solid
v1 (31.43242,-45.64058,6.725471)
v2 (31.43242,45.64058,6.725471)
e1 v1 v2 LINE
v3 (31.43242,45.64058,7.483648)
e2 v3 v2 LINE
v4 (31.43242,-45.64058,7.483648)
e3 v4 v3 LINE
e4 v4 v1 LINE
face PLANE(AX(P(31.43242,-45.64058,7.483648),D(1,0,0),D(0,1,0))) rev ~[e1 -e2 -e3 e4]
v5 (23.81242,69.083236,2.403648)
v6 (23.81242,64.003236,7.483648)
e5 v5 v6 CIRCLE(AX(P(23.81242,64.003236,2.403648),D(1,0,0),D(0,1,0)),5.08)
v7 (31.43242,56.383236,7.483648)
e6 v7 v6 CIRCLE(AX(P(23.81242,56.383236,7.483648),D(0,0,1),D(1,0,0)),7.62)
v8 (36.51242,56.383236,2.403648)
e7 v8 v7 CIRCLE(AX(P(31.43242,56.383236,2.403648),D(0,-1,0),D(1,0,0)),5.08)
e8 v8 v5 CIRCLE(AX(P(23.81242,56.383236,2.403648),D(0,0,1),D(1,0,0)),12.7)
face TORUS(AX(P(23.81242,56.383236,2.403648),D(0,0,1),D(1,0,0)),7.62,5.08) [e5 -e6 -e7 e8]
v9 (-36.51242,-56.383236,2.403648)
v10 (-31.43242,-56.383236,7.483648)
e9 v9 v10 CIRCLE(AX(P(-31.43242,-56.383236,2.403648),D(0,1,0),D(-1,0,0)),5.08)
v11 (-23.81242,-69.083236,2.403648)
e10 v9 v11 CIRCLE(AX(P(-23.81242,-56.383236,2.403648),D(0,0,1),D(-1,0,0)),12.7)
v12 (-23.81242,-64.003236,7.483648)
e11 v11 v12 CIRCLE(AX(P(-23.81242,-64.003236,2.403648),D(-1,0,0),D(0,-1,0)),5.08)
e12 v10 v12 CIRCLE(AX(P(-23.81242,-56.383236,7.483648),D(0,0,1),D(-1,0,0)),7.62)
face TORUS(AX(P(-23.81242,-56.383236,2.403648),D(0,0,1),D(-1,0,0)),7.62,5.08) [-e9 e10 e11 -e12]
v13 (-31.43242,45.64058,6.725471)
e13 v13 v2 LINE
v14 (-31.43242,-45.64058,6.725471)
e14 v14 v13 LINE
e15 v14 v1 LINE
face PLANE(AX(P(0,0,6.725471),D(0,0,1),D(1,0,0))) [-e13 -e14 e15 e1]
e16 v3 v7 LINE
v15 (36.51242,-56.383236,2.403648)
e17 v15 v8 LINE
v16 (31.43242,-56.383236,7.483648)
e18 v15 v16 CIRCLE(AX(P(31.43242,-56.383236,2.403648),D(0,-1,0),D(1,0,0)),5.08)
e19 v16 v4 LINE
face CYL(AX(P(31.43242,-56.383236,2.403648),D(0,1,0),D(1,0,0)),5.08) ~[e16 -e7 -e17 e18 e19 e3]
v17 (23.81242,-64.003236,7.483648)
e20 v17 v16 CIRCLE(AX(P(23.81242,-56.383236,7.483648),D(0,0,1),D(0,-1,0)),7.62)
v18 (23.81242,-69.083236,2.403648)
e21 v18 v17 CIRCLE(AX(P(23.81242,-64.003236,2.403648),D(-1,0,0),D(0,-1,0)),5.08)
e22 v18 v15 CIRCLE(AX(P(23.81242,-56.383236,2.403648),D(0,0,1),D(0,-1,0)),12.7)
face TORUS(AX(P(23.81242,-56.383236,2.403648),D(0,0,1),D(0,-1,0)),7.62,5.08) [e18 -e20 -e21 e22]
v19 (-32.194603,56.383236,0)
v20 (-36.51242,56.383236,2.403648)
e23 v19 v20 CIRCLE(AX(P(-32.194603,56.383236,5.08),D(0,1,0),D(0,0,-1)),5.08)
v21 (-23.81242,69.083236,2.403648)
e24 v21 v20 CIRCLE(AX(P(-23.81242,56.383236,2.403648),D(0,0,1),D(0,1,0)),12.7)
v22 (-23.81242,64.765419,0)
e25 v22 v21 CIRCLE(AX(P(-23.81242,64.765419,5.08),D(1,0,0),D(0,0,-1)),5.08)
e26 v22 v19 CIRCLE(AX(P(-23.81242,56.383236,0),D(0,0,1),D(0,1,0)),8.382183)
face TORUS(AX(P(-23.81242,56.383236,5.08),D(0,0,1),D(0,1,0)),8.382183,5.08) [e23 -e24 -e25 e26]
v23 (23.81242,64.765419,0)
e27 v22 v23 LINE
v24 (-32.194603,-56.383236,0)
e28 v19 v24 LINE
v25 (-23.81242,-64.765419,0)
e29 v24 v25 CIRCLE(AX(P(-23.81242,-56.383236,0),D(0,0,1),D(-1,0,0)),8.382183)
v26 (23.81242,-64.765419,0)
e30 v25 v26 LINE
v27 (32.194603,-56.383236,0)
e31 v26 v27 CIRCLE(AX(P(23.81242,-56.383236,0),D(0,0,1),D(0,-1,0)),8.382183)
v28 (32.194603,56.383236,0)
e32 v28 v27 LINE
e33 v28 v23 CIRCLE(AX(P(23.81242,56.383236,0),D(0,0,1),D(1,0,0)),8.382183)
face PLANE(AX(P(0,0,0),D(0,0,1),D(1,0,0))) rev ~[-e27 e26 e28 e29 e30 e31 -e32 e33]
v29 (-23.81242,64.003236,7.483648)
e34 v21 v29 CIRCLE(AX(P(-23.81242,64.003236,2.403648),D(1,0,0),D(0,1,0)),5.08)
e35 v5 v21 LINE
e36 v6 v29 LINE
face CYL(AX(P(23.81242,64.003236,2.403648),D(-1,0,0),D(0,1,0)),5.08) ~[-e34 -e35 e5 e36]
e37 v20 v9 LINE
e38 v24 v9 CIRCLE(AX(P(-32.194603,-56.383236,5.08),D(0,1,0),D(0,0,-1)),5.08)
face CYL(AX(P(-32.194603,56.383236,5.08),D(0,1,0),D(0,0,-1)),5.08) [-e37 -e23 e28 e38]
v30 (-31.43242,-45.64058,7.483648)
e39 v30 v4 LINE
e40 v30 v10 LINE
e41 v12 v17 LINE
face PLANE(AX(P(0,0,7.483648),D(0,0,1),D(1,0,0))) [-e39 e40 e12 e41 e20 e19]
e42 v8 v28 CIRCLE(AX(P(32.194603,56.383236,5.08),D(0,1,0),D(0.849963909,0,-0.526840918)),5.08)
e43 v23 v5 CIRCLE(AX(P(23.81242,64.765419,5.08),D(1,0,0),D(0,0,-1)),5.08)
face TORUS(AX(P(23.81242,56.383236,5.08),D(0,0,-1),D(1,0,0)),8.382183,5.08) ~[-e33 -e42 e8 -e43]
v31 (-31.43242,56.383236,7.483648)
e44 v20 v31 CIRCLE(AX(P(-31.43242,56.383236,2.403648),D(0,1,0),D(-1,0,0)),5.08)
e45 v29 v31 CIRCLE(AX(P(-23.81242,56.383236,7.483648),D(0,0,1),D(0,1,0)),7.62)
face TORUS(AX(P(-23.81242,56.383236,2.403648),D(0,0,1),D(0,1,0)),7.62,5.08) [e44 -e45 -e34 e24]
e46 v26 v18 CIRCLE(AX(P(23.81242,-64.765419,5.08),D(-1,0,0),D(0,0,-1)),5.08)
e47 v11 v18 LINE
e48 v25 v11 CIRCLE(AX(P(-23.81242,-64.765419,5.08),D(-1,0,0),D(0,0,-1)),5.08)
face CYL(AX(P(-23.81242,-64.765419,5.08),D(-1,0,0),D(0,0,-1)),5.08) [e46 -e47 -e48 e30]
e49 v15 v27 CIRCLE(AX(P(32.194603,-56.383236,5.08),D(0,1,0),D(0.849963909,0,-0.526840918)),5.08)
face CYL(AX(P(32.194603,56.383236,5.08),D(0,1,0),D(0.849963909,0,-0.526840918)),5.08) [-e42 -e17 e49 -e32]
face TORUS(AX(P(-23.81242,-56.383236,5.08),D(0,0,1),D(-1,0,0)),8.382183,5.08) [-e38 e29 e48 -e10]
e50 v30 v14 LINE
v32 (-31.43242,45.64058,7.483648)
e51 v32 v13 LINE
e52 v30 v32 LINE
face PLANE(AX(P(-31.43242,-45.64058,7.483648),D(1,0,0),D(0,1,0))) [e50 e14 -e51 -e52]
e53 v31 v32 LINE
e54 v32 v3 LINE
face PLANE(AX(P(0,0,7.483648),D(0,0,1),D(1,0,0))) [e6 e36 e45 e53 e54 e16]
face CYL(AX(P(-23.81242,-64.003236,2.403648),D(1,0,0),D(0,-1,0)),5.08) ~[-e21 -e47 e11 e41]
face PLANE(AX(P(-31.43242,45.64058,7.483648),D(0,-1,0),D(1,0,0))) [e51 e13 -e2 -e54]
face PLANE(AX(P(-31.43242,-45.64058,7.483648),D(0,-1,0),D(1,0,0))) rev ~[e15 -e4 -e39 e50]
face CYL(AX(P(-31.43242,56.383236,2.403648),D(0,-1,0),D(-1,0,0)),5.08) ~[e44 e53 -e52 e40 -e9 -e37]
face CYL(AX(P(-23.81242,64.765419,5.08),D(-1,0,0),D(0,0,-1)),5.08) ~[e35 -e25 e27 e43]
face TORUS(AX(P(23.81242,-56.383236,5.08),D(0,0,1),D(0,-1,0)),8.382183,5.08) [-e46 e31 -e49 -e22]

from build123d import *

# Parameters (mm, degrees)
F1_DEPTH     = 7.4836481363
F2_R         = 5.08
F3_T1_DEPTH  = 47.6248391628
F3_T3_DEPTH  = 112.7664723158
F3_T6_ANGLE  = 90
F3_T8_ANGLE  = 90
F3_T10_ANGLE = 90
F3_T12_ANGLE = 90
F4_W         = 62.8648391628
F4_H         = 91.2811607122
F5_DEPTH     = 0.7581766695


# Not quite as in the source:
# - a fillet or chamfer that OpenCascade refuses, or shapes differently, is made with other operations: its cross-section is extruded or revolved along the edge and cut away or added


with BuildPart() as f1:
    # F0 (on Top) → F1 (new body)
    with BuildSketch(Plane.XY):
        with BuildLine():
            ThreePointArc((36.5124195814, 56.3832361579), (32.7926757025, 65.363492279), (23.8124195814, 69.0832361579))
            Line((23.8124195814, 69.0832361579), (-23.8124195814, 69.0832361579))
            ThreePointArc((-23.8124195814, 69.0832361579), (-32.7926757025, 65.363492279), (-36.5124195814, 56.3832361579))
            Line((-36.5124195814, 56.3832361579), (-36.5124195814, -56.3832361579))
            ThreePointArc((-36.5124195814, -56.3832361579), (-32.7926757025, -65.363492279), (-23.8124195814, -69.0832361579))
            Line((-23.8124195814, -69.0832361579), (23.8124195814, -69.0832361579))
            ThreePointArc((23.8124195814, -69.0832361579), (32.7926757025, -65.363492279), (36.5124195814, -56.3832361579))
            Line((36.5124195814, -56.3832361579), (36.5124195814, 56.3832361579))
        make_face()
    extrude(amount=F1_DEPTH)

    # F2
    f2_edges = [f1.edges().sort_by_distance(p)[0] for p in [
        (0, -69.083236, 7.483648),
    ]]
    fillet(f2_edges, radius=F2_R)

    # F3: fillet of radius 5.08 on 1 edges, made by hand

    # F3_s2 → F3_t1 (cut)
    with BuildSketch(Plane.YZ.offset(-23.8124195814)):
        with BuildLine():
            ThreePointArc((-64.7654194988, 0), (-67.2363032003, 0.6414040808), (-69.0832361579, 2.4036481363))
            Line((-69.0832361579, 2.4036481363), (-69.0832361579, 0))
            Line((-69.0832361579, 0), (-64.7654194988, 0))
        make_face()
        with BuildLine():
            ThreePointArc((64.7654194988, 0), (67.2363032003, 0.6414040808), (69.0832361579, 2.4036481363))
            Line((69.0832361579, 2.4036481363), (69.0832361579, 0))
            Line((69.0832361579, 0), (64.7654194988, 0))
        make_face()
    extrude(amount=F3_T1_DEPTH, mode=Mode.SUBTRACT)

    # F3_s4 → F3_t3 (cut)
    with BuildSketch(Plane.XZ.offset(-56.3832361579)):
        with BuildLine():
            ThreePointArc((36.5124195814, 2.4036481363), (34.6654866238, 0.6414040808), (32.1946029223, 0))
            Line((32.1946029223, 0), (36.5124195814, 0))
            Line((36.5124195814, 0), (36.5124195814, 2.4036481363))
        make_face()
        with BuildLine():
            ThreePointArc((-32.1946029223, 0), (-34.6654866238, 0.6414040808), (-36.5124195814, 2.4036481363))
            Line((-36.5124195814, 2.4036481363), (-36.5124195814, 0))
            Line((-36.5124195814, 0), (-32.1946029223, 0))
        make_face()
    extrude(amount=F3_T3_DEPTH, mode=Mode.SUBTRACT)

    # F3_s5 → F3_t6 (revolve, cut)
    with BuildSketch(Plane.XZ.offset(56.3832361579)):
        with BuildLine():
            ThreePointArc((-32.1946029223, 0), (-34.6654866238, 0.6414040808), (-36.5124195814, 2.4036481363))
            Line((-36.5124195814, 2.4036481363), (-36.5124195814, 0))
            Line((-36.5124195814, 0), (-32.1946029223, 0))
        make_face()
    revolve(axis=Axis((-23.8124195814, -56.3832361579, 0), (0, 0, 1)), revolution_arc=F3_T6_ANGLE, mode=Mode.SUBTRACT)

    # F3_s7 → F3_t8 (revolve, cut)
    with BuildSketch(Plane.YZ.offset(23.8124195814)):
        with BuildLine():
            ThreePointArc((-64.7654194988, 0), (-67.2363032003, 0.6414040808), (-69.0832361579, 2.4036481363))
            Line((-69.0832361579, 2.4036481363), (-69.0832361579, 0))
            Line((-69.0832361579, 0), (-64.7654194988, 0))
        make_face()
    revolve(axis=Axis((23.8124195814, -56.3832361579, 0), (0, 0, 1)), revolution_arc=F3_T8_ANGLE, mode=Mode.SUBTRACT)

    # F3_s9 → F3_t10 (revolve, cut)
    with BuildSketch(Plane.XZ.offset(-56.3832361579)):
        with BuildLine():
            ThreePointArc((36.5124195814, 2.4036481363), (34.6654866238, 0.6414040808), (32.1946029223, 0))
            Line((32.1946029223, 0), (36.5124195814, 0))
            Line((36.5124195814, 0), (36.5124195814, 2.4036481363))
        make_face()
    revolve(axis=Axis((23.8124195814, 56.3832361579, 0), (0, 0, 1)), revolution_arc=F3_T10_ANGLE, mode=Mode.SUBTRACT)

    # F3_s11 → F3_t12 (revolve, cut)
    with BuildSketch(Plane.YZ.offset(-23.8124195814)):
        with BuildLine():
            ThreePointArc((64.7654194988, 0), (67.2363032003, 0.6414040808), (69.0832361579, 2.4036481363))
            Line((69.0832361579, 2.4036481363), (69.0832361579, 0))
            Line((69.0832361579, 0), (64.7654194988, 0))
        make_face()
    revolve(axis=Axis((-23.8124195814, 56.3832361579, 0), (0, 0, 1)), revolution_arc=F3_T12_ANGLE, mode=Mode.SUBTRACT)

    # F4 (on face) → F5 (cut)
    with BuildSketch(Plane.XY.offset(7.4836481363)):
        Rectangle(F4_W, F4_H)
    extrude(amount=-F5_DEPTH, mode=Mode.SUBTRACT)


solid = f1.part
